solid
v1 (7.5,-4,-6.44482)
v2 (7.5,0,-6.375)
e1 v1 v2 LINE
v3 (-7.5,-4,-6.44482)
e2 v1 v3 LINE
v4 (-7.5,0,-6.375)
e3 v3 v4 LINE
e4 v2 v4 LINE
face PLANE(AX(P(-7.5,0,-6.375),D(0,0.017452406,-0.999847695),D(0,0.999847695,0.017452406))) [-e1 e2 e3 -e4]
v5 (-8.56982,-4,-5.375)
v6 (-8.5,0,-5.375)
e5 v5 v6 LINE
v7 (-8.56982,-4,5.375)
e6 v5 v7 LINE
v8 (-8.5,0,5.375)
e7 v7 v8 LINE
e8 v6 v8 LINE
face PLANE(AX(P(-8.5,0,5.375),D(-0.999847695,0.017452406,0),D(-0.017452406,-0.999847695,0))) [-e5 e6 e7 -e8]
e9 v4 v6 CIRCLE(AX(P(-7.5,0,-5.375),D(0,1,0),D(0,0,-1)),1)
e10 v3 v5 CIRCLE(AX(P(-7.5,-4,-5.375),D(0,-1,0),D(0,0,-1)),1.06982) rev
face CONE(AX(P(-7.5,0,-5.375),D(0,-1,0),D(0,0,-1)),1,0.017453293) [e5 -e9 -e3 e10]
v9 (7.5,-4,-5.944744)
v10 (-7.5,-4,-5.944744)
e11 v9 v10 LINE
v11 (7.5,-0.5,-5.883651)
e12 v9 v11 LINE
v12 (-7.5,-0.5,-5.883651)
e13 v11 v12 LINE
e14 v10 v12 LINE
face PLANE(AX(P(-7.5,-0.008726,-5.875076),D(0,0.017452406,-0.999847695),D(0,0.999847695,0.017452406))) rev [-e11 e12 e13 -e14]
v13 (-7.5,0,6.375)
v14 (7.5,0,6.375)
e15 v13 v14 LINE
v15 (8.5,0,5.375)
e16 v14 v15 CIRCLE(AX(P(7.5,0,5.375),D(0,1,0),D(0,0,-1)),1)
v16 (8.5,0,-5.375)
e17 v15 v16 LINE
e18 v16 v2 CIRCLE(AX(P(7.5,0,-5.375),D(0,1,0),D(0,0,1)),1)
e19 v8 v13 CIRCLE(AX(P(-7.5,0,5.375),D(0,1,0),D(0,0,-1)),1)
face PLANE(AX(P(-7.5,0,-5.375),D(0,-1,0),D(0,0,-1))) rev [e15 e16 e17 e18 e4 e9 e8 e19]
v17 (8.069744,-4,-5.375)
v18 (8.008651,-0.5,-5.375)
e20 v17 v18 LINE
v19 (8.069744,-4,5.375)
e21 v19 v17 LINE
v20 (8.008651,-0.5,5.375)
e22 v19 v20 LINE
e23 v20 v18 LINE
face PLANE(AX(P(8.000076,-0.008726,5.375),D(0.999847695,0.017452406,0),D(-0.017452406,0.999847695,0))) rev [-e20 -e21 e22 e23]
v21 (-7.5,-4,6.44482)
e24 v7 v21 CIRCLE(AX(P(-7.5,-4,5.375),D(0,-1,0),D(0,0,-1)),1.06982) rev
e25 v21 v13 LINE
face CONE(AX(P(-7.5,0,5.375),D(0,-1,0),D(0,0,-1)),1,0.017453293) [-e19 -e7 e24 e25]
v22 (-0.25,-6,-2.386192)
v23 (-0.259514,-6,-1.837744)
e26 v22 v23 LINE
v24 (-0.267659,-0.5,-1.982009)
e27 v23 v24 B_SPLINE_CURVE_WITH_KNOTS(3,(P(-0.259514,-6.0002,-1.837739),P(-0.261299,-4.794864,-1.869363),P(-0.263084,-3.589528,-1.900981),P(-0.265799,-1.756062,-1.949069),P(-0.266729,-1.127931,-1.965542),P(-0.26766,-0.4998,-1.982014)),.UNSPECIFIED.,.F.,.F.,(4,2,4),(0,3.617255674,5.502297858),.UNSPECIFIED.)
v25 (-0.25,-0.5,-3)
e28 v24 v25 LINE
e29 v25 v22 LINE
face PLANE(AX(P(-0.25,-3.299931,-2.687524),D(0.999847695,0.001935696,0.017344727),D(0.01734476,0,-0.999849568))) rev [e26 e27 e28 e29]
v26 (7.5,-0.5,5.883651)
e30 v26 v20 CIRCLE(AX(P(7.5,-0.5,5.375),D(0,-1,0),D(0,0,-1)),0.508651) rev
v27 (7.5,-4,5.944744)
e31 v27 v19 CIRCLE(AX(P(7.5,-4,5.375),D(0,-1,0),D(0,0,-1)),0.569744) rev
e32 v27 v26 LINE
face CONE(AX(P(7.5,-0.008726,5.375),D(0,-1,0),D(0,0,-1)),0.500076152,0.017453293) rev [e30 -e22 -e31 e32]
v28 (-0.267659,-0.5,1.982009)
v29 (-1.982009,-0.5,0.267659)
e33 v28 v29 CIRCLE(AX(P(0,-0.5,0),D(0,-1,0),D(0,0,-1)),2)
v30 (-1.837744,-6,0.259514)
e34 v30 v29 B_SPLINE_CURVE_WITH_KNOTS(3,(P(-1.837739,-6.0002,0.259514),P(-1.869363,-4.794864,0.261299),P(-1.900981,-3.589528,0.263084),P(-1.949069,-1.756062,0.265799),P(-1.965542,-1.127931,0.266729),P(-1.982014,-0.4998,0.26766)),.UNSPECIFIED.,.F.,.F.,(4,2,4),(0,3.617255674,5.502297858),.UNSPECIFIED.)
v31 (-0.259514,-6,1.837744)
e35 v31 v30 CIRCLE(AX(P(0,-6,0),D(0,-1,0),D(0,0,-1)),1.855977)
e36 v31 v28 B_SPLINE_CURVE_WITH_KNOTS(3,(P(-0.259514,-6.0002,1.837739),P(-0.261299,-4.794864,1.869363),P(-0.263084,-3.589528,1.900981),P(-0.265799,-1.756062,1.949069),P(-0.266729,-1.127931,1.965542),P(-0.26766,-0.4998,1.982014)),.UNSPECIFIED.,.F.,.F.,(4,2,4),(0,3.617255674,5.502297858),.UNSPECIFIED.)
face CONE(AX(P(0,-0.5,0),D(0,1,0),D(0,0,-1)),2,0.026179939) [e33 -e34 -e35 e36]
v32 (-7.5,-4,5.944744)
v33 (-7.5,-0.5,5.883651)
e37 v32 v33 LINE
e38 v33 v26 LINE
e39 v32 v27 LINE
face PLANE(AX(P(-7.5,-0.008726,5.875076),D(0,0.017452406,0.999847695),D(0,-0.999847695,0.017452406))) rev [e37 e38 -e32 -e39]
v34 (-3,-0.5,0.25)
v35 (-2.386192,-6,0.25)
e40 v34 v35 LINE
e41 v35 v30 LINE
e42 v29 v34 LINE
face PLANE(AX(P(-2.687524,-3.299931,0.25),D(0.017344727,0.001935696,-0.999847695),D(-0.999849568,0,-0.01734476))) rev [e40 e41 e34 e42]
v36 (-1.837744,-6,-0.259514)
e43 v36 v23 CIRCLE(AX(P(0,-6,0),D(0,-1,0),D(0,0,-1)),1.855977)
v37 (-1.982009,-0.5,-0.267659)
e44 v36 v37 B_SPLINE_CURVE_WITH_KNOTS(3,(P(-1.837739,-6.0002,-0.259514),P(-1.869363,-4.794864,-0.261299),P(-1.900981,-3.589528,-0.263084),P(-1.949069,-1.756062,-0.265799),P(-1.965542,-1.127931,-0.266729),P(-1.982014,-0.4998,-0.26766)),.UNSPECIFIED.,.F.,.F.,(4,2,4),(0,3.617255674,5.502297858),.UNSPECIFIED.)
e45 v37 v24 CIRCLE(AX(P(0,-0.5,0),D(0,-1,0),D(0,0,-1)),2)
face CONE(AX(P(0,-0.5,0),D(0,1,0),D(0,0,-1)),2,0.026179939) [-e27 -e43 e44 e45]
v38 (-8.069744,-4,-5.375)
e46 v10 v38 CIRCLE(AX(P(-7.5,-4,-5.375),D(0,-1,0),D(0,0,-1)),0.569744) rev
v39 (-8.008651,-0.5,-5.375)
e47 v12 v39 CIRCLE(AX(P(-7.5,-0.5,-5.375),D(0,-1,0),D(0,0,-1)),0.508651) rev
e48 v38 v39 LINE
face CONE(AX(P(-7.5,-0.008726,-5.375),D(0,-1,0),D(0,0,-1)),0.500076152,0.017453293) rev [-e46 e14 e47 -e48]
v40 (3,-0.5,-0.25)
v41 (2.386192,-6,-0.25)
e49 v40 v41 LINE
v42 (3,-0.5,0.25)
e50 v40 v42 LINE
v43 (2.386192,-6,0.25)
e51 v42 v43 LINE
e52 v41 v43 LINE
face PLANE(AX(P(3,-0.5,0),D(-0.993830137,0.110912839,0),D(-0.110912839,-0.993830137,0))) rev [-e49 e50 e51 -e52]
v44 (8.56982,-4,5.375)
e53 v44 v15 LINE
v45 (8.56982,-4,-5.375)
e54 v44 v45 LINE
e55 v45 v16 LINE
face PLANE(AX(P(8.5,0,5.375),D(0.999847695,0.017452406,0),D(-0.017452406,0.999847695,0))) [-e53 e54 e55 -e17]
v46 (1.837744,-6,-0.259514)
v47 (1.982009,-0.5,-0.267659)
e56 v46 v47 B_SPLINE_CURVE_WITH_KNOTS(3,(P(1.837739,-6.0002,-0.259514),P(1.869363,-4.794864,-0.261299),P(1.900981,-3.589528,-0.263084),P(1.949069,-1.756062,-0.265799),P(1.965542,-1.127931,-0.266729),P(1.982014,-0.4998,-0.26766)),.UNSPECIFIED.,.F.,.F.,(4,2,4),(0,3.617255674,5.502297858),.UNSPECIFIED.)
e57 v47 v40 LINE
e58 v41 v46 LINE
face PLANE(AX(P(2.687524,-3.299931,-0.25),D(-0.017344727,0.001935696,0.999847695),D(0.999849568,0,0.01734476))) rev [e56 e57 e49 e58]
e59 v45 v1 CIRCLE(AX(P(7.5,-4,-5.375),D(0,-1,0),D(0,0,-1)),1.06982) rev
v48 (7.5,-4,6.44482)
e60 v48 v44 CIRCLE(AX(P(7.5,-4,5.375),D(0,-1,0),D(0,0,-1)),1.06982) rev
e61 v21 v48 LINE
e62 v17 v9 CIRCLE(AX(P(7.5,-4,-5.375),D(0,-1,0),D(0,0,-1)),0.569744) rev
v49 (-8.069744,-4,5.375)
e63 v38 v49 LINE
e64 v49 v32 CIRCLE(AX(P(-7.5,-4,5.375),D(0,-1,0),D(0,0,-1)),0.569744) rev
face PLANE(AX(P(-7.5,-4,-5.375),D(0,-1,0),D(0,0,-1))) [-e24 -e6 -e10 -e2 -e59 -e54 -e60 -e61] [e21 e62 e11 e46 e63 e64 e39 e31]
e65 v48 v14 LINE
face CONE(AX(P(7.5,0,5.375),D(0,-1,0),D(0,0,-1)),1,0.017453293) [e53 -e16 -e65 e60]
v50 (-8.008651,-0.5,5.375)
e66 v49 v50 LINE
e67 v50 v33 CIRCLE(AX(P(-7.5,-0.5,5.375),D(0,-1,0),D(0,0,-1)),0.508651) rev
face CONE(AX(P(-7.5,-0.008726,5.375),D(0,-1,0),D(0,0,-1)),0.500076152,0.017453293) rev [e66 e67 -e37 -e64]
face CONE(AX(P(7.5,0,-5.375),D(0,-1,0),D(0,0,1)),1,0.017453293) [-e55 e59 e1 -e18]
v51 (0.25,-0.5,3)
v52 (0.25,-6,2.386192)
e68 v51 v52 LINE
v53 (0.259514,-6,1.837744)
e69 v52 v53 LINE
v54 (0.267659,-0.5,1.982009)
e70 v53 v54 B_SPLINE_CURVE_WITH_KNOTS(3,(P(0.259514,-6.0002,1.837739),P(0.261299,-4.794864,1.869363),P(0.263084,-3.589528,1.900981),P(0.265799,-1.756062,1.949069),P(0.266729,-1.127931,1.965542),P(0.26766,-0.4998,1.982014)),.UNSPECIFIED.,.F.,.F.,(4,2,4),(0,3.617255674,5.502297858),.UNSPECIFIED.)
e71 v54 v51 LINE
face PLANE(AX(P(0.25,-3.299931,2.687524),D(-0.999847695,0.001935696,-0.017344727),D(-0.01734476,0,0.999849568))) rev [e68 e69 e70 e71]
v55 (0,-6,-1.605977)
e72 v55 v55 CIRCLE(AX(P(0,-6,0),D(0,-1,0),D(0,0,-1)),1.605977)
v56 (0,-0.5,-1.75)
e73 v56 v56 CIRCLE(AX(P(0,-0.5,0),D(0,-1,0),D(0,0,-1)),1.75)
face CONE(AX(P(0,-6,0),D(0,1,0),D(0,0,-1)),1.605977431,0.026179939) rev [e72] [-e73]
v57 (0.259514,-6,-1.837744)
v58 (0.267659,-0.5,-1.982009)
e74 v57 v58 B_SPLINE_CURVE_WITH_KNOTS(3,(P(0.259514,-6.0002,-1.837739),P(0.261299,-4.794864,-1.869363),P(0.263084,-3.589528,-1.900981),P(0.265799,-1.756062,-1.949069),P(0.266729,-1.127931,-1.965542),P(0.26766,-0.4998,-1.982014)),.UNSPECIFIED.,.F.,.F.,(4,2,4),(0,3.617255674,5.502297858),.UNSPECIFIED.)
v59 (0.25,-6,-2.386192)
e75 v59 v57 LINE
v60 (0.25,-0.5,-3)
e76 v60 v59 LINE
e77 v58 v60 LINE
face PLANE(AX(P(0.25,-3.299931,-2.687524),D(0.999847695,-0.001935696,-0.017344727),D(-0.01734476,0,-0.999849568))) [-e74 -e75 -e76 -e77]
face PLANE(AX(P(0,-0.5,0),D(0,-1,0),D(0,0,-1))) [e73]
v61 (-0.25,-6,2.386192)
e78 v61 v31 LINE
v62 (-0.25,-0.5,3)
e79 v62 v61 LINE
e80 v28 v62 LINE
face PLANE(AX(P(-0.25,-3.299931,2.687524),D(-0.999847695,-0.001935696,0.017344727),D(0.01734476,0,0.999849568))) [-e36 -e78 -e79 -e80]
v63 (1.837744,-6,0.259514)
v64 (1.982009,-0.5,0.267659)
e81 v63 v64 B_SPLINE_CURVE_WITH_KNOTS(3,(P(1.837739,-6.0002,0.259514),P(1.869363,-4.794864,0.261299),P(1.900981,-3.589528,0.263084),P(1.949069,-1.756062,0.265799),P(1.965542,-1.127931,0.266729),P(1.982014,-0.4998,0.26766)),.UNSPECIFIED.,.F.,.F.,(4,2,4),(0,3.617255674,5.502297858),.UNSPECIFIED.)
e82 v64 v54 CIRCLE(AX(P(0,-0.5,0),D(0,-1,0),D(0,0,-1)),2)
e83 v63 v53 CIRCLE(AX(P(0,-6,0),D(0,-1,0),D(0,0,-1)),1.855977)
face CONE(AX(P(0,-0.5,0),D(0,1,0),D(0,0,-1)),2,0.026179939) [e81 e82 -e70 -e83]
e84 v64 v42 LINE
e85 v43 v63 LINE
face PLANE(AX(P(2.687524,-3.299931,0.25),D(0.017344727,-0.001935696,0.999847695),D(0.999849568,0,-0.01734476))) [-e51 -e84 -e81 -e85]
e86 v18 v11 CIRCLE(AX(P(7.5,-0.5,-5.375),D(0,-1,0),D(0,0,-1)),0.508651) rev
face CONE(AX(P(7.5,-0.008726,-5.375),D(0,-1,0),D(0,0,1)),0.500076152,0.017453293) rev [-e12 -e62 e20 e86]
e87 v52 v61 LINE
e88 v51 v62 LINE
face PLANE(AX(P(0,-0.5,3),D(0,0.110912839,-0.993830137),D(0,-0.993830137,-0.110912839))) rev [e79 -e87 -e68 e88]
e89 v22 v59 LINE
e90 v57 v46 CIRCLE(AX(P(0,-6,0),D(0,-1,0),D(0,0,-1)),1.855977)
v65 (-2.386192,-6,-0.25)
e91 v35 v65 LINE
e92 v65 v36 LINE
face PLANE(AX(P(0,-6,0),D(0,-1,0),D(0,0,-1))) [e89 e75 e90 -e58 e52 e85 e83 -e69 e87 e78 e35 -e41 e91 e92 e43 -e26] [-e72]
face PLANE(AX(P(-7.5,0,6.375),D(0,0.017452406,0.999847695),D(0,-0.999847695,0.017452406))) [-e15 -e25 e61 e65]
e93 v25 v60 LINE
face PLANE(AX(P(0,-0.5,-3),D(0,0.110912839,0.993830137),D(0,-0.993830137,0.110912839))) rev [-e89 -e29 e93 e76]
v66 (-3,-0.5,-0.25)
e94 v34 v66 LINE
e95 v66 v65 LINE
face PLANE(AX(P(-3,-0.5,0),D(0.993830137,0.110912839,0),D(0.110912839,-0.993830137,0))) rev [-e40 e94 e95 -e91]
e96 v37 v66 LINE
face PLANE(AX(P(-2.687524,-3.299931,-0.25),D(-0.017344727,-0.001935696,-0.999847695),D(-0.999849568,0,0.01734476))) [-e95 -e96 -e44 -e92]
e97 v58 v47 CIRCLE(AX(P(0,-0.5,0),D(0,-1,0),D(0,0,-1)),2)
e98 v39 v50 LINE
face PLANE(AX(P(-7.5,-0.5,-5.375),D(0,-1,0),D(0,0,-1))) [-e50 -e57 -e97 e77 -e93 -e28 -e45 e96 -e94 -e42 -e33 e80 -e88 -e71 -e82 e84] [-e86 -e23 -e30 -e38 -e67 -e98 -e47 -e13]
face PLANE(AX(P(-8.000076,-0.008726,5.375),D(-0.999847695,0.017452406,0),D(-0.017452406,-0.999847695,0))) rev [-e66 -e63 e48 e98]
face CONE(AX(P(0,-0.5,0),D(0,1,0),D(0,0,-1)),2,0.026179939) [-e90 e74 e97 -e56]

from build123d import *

# Parameters (mm, degrees)
BOSS_EXTRUDE1_DEPTH = 4
BOSS_EXTRUDE1_DRAFT = 1
SHELL1_T            = -0.5
SKETCH2_R           = 2
BOSS_EXTRUDE2_DEPTH = 5.5
BOSS_EXTRUDE2_TAPER = 1.5
CIRPATTERN1_COUNT   = 4
SKETCH4_R           = 1.605977431
CUT_EXTRUDE1_DEPTH  = 5.5
CUT_EXTRUDE1_DRAFT  = 1.5


with BuildPart() as part:
    # Sketch1 → Boss-Extrude1 (with draft: the straight prism first)
    with BuildSketch(Plane(origin=(0, 0, 0), x_dir=(1, 0, 0), z_dir=(0, 1, 0))):
        with BuildLine():
            Line((-7.5, -6.375), (7.5, -6.375))
            ThreePointArc((7.5, -6.375), (8.207106781, -6.082106781), (8.5, -5.375))
            Line((8.5, -5.375), (8.5, 5.375))
            ThreePointArc((8.5, 5.375), (8.207106781, 6.082106781), (7.5, 6.375))
            Line((7.5, 6.375), (-7.5, 6.375))
            ThreePointArc((-7.5, 6.375), (-8.207106781, 6.082106781), (-8.5, 5.375))
            Line((-8.5, 5.375), (-8.5, -5.375))
            ThreePointArc((-8.5, -5.375), (-8.207106781, -6.082106781), (-7.5, -6.375))
        make_face()
    extrude(amount=-BOSS_EXTRUDE1_DEPTH)
    # Boss-Extrude1: the draft: its side faces are tilted about the plane it starts from
    boss_extrude1_sides = [part.faces().sort_by_distance(p)[0] for p in [
        (0, -2, 6.375),
        (8.207106781, -2, 6.082106781),
        (8.5, -2, 0),
        (8.207106781, -2, -6.082106781),
        (0, -2, -6.375),
        (-8.207106781, -2, -6.082106781),
        (-8.5, -2, 0),
        (-8.207106781, -2, 6.082106781),
    ]]
    draft(boss_extrude1_sides, Plane(origin=(0, 0, 0), x_dir=(1, 0, 0), z_dir=(0, 1, 0)), BOSS_EXTRUDE1_DRAFT)

    # Shell1
    shell1_openings = [part.faces().sort_by_distance(p)[0] for p in [
        (0, -4, 0),
    ]]
    offset(amount=SHELL1_T, openings=shell1_openings, kind=Kind.INTERSECTION)

    # Sketch2 → Boss-Extrude2 (add)
    with BuildSketch(Plane.XZ.offset(0.5)):
        Circle(SKETCH2_R)
    extrude(amount=BOSS_EXTRUDE2_DEPTH, taper=BOSS_EXTRUDE2_TAPER)

    # Rib1: read off the stored shape, not the designer's step
    # Rib1: loft between two sections, ruled curve by curve
    rib1_from = [
        Edge.make_line((1.98200868, -0.5, 0.267659472), (3, -0.5, 0.25)),
        Edge.make_line((1.98200868, -0.5, -0.267659472), (3, -0.5, -0.25)),
        Edge.make_line((3, -0.5, -0.25), (3, -0.5, 0.25)),
        Edge.make_line((1.98200868, -0.5, -0.267659472), (1.98200868, -0.5, 0.267659472)),
    ]
    rib1_to = [
        Edge.make_line((1.837744445, -6, 0.259514127), (2.386192277, -6, 0.25)),
        Edge.make_line((1.837744445, -6, -0.259514127), (2.386192277, -6, -0.25)),
        Edge.make_line((2.386192277, -6, -0.25), (2.386192277, -6, 0.25)),
        Edge.make_line((1.837744445, -6, -0.259514127), (1.837744445, -6, 0.259514127)),
    ]
    rib1 = Solid(Shell([*[Face.make_surface_from_curves(rib1_from[k], rib1_to[k]) for k in range(4)], Face(Wire(rib1_from)), Face(Wire(rib1_to))]))
    add(rib1)

    # CirPattern1: Rib1 ×4 about axis
    cirpattern1_axis = Axis((0, 0, 0), (0, 1, 0))
    for i in range(1, CIRPATTERN1_COUNT):
        add(rib1.rotate(cirpattern1_axis, i * 360 / CIRPATTERN1_COUNT))


with BuildPart() as cut_extrude1_tool:
    # Sketch4 → Cut-Extrude1 (with draft: the straight prism first)
    with BuildSketch(Plane.XZ.offset(6)):
        Circle(SKETCH4_R)
    extrude(amount=-CUT_EXTRUDE1_DEPTH)
    # Cut-Extrude1: the draft: its side faces are tilted about the plane it starts from
    cut_extrude1_sides = [cut_extrude1_tool.faces().sort_by_distance(p)[0] for p in [
        (-1.605977431, -3.25, 0),
    ]]
    draft(cut_extrude1_sides, Plane.XZ.offset(6), CUT_EXTRUDE1_DRAFT)


with BuildPart() as part_1:
    add(part.part)

    # Cut-Extrude1: cut by cut_extrude1_tool
    add(cut_extrude1_tool.part, mode=Mode.SUBTRACT)


solid = part_1.part
